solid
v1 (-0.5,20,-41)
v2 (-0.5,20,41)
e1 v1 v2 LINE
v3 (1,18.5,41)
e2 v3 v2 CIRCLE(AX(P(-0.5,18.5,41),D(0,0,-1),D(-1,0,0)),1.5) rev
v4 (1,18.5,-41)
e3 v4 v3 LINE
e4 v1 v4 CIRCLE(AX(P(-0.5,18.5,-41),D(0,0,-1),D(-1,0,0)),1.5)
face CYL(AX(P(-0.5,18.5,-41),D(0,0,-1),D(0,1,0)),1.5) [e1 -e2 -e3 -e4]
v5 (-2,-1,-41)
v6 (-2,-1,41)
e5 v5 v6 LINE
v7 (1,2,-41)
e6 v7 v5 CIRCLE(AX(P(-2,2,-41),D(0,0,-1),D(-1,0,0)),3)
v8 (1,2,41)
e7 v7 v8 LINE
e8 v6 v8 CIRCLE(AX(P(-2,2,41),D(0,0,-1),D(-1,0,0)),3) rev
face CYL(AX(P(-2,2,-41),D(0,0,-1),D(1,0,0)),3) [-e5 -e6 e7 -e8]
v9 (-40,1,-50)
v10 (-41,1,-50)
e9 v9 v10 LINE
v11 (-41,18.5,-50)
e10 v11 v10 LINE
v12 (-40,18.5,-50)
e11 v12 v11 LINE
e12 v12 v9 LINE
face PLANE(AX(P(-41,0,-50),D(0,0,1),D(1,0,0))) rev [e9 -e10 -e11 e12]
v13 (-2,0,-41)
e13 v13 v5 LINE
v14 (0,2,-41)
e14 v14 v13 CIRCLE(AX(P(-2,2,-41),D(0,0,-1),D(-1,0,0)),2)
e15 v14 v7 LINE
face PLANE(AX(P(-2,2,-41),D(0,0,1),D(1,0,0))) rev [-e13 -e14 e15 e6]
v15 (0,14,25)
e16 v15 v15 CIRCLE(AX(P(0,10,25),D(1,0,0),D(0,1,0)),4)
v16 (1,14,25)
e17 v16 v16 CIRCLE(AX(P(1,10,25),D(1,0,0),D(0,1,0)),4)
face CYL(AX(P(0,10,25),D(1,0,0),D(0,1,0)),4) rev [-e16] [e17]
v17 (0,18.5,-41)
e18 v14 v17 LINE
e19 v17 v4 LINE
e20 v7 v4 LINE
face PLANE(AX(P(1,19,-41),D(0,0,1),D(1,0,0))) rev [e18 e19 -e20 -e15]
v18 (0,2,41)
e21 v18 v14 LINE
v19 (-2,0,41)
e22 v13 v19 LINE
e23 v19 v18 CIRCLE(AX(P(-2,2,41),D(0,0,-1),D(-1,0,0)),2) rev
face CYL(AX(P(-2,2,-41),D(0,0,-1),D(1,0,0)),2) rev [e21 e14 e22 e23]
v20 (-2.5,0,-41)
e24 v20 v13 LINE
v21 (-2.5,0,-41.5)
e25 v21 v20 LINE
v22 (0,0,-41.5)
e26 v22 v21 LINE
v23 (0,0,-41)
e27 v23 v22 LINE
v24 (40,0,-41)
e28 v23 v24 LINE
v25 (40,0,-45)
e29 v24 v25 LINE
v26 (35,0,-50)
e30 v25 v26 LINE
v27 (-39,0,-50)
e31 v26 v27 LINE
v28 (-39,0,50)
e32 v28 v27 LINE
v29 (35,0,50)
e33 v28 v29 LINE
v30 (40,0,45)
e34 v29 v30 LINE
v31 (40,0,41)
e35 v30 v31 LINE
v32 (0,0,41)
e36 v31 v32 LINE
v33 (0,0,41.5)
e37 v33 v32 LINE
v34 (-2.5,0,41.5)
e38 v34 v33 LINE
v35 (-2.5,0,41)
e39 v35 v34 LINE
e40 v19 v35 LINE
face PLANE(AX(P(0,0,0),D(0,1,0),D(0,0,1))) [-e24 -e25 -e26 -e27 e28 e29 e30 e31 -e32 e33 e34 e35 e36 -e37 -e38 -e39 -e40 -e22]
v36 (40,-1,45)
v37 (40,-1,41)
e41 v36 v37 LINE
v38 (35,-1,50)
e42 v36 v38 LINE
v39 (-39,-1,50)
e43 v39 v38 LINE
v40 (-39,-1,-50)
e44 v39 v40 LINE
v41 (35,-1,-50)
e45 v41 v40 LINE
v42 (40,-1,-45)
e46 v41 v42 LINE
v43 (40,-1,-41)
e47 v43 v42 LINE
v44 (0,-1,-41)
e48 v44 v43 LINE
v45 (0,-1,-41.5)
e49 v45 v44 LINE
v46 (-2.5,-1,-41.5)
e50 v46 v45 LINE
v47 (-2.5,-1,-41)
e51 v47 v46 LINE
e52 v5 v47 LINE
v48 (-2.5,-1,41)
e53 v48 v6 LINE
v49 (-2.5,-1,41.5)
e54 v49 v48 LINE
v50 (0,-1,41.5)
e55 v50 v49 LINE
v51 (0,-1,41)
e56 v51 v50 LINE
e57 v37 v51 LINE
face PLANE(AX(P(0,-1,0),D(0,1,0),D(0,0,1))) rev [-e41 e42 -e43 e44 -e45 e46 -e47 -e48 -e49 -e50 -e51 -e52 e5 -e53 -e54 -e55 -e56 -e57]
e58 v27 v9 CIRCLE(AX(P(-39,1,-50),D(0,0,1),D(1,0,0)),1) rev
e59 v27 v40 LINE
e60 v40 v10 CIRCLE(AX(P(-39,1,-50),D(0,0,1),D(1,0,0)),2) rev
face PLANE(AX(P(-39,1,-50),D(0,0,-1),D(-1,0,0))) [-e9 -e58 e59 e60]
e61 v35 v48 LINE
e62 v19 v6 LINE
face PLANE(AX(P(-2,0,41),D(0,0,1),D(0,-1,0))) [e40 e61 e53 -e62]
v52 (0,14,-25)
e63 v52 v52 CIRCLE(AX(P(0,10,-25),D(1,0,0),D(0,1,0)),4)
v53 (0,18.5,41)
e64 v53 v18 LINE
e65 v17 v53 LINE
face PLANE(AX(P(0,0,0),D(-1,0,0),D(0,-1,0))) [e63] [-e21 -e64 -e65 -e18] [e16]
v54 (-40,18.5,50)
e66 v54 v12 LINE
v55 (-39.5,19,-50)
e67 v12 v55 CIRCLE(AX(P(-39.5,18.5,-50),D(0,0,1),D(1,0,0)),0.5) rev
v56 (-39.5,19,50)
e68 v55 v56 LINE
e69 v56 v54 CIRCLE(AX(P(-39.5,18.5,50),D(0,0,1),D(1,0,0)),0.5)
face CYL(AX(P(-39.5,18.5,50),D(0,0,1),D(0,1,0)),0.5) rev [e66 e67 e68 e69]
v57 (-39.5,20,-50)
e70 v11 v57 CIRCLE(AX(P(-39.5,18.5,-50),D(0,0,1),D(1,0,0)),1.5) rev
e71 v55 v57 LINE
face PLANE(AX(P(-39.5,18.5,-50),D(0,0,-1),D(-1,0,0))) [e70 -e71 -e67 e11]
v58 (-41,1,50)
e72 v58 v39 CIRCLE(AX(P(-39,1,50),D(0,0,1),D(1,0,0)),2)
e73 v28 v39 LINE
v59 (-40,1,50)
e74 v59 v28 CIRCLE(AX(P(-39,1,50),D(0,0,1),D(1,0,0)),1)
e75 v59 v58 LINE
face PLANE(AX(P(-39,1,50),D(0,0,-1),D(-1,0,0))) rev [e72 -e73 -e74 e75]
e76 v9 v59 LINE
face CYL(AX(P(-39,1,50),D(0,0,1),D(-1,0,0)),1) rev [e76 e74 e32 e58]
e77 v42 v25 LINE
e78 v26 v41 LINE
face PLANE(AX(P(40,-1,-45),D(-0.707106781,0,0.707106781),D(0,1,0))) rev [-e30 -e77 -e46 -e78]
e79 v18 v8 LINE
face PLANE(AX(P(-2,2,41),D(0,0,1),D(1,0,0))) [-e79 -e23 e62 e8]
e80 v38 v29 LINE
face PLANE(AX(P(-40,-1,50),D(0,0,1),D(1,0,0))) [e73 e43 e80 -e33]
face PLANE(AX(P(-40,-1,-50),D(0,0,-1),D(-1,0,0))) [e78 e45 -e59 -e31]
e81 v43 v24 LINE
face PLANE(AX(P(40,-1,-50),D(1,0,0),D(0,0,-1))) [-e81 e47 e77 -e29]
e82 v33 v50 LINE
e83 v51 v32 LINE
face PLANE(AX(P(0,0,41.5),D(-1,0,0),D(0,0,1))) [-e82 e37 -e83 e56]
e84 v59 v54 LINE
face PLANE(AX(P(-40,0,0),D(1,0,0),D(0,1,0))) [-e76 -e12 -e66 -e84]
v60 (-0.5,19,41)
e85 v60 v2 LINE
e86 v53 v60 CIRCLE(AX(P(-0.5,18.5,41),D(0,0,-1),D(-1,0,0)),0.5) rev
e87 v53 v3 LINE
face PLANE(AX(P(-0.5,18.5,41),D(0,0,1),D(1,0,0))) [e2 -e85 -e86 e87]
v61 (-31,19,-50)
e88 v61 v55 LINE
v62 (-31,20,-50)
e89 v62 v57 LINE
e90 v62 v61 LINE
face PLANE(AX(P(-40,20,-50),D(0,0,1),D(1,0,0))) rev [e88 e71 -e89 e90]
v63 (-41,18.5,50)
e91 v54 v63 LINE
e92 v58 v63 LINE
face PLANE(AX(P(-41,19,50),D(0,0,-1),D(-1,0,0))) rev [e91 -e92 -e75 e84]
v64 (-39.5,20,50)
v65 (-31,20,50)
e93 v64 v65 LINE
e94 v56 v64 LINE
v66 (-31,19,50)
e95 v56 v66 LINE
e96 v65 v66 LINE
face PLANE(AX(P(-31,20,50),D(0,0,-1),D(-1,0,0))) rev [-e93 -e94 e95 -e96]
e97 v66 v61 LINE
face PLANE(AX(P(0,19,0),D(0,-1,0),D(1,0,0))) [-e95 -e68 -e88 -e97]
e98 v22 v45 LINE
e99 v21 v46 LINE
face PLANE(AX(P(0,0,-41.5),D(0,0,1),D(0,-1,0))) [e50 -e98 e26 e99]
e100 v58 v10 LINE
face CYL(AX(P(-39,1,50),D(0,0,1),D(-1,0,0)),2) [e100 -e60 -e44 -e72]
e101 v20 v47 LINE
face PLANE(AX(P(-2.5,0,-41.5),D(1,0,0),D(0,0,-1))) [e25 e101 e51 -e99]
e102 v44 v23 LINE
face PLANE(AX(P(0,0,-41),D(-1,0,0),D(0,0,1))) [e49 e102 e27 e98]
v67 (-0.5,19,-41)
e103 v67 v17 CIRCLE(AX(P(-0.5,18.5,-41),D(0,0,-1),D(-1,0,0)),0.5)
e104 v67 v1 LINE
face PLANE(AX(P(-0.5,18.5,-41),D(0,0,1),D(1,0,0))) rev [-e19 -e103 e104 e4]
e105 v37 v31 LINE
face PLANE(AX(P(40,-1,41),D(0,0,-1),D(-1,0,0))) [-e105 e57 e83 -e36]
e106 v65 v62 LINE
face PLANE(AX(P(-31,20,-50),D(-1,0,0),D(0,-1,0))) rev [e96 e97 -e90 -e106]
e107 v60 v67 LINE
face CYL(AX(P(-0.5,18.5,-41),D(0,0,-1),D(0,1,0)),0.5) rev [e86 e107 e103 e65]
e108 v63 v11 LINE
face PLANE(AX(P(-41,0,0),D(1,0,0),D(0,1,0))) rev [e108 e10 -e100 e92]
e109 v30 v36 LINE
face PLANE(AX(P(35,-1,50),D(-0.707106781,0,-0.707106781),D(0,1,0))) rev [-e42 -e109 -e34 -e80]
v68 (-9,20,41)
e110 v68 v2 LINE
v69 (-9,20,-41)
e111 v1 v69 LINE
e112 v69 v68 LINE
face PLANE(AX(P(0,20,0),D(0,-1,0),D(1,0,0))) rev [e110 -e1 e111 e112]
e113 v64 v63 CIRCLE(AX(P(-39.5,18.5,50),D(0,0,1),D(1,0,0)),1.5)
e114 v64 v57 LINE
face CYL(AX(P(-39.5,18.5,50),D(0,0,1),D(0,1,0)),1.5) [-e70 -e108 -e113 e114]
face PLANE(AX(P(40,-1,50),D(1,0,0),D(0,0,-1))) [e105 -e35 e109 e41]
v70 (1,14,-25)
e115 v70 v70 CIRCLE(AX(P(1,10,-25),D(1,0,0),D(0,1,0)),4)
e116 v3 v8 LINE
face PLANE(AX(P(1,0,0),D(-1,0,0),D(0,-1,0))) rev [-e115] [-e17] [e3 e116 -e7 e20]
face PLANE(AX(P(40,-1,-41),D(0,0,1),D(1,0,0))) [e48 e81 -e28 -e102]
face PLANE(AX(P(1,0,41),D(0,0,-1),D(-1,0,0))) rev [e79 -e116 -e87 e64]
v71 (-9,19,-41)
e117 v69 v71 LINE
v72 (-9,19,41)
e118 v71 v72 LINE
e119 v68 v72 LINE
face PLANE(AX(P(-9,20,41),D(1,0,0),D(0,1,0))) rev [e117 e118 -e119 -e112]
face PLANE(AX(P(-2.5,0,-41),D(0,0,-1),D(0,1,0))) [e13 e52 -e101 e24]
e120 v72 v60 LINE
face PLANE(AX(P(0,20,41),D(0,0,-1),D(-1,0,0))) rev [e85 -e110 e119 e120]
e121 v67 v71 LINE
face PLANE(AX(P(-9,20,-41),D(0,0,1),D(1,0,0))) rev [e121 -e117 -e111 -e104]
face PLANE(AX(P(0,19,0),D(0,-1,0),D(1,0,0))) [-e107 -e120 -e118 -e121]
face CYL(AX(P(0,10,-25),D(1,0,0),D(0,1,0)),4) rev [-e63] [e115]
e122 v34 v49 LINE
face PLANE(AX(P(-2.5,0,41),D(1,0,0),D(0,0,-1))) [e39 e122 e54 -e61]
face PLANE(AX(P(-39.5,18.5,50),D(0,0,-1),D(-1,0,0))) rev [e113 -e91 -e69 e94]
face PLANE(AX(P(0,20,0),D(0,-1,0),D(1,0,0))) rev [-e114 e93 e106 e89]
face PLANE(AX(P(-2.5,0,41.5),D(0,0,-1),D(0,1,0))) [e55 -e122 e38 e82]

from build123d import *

# Parameters (mm, degrees)
BASE_FLANGE1_DEPTH           = 1
BREAK_CORNER1_START          = 60.104076401
BREAK_CORNER1_OUTLINE_W      = 72.104076401
BREAK_CORNER1_OUTLINE_H      = 3
BREAK_CORNER1_DEPTH          = 3.535533906
BREAK_CORNER1_START_2        = -12
BREAK_CORNER1_2_OUTLINE_W    = 4.895923599
BREAK_CORNER1_2_OUTLINE_H    = 3
BREAK_CORNER1_2_DEPTH        = 11.292893219
EDGE_FLANGE1_STRIP_W         = 6
EDGE_FLANGE1_STRIP_H         = 1
EDGE_FLANGE1_STRIP_CUT_DEPTH = 100
EDGE_FLANGE1_DEPTH           = 100
EDGE_FLANGE2_STRIP_W         = 5
EDGE_FLANGE2_STRIP_H         = 1
EDGE_FLANGE2_STRIP_CUT_DEPTH = 100
EDGE_FLANGE2_DEPTH           = 100
EDGE_FLANGE3_START           = -2.5
EDGE_FLANGE3_OUTLINE_W       = 0.5
EDGE_FLANGE3_OUTLINE_H       = 1
EDGE_FLANGE3_DEPTH           = 2.5
EDGE_FLANGE3_START_2         = -1.23595
EDGE_FLANGE3_2_OUTLINE_W     = 19
EDGE_FLANGE3_2_OUTLINE_H     = 82
EDGE_FLANGE3_2_DEPTH         = 2.23595
EDGE_FLANGE3_3_OUTLINE_W     = 1
EDGE_FLANGE3_3_OUTLINE_H     = 82
EDGE_FLANGE3_3_DEPTH         = 0.70822
EDGE_FLANGE3_START_3         = -41
EDGE_FLANGE3_4_DEPTH         = 82
EDGE_FLANGE3_5_DEPTH         = 82
EDGE_FLANGE4_STRIP_W         = 5
EDGE_FLANGE4_STRIP_H         = 1
EDGE_FLANGE4_STRIP_CUT_DEPTH = 82
EDGE_FLANGE4_DEPTH           = 82
SKETCH18_R                   = 4
CUT_EXTRUDE1_DEPTH           = 10


with BuildPart() as part:
    # Base-Flange1: sheet metal written as solids
    # Sketch1 → Base-Flange1 (new body)
    with BuildSketch(Plane(origin=(0, 0, 0), x_dir=(1, 0, 0), z_dir=(0, 1, 0))):
        Polygon((39.172092849, 50), (40, 50), (40, 41), (0, 41), (0, -41), (40, -41), (40, -50), (-40, -50), (-40, 50), align=None)
    extrude(amount=-BASE_FLANGE1_DEPTH)

    # Break-Corner1: read off the stored shape, not the designer's step
    # Break-Corner1 outline → Break-Corner1 (cut)
    with BuildSketch(Plane(origin=(0, 0, 0), x_dir=(0.707106781186548, 0, -0.707106781186547), z_dir=(0.707106781186547, 0, 0.707106781186548)).offset(BREAK_CORNER1_START)):
        with Locations((24.052038201, -0.5)):
            Rectangle(BREAK_CORNER1_OUTLINE_W, BREAK_CORNER1_OUTLINE_H)
    extrude(amount=BREAK_CORNER1_DEPTH, mode=Mode.SUBTRACT)

    # Break-Corner1 2 outline → Break-Corner1 2 (cut)
    with BuildSketch(Plane(origin=(0, 0, 0), x_dir=(0.707106781186548, 0, -0.707106781186547), z_dir=(0.707106781186547, 0, 0.707106781186548)).offset(BREAK_CORNER1_START_2)):
        with Locations((62.552038201, -0.5)):
            Rectangle(BREAK_CORNER1_2_OUTLINE_W, BREAK_CORNER1_2_OUTLINE_H)
    extrude(amount=BREAK_CORNER1_2_DEPTH, mode=Mode.SUBTRACT)

    # Edge-Flange1: sheet metal written as solids
    # Edge-Flange1 strip (on a plane across the edge) → Edge-Flange1 strip cut (cut)
    with BuildSketch(Plane(origin=(-40, 0, -50), x_dir=(1, 0, 0), z_dir=(0, 0, 1))):
        with Locations((-2, -0.5)):
            Rectangle(EDGE_FLANGE1_STRIP_W, EDGE_FLANGE1_STRIP_H)
    extrude(amount=EDGE_FLANGE1_STRIP_CUT_DEPTH, mode=Mode.SUBTRACT)

    # Edge-Flange1 section (on a plane across the edge) → Edge-Flange1 (add)
    with BuildSketch(Plane(origin=(-40, 0, -50), x_dir=(1, 0, 0), z_dir=(0, 0, 1))):
        with BuildLine():
            Line((-1, 1), (-1, 19))
            Line((-1, 19), (0, 19))
            Line((0, 19), (0, 1))
            ThreePointArc((0, 1), (0.292893219, 0.292893219), (1, 0))
            Line((1, 0), (1, -1))
            ThreePointArc((1, -1), (-0.414213562, -0.414213562), (-1, 1))
        make_face()
    extrude(amount=EDGE_FLANGE1_DEPTH)

    # Edge-Flange2: sheet metal written as solids
    # Edge-Flange2 strip (on a plane across the edge) → Edge-Flange2 strip cut (cut)
    with BuildSketch(Plane(origin=(-40, 19, -50), x_dir=(0, -1, 0), z_dir=(0, 0, 1))):
        with Locations((-2, -0.5)):
            Rectangle(EDGE_FLANGE2_STRIP_W, EDGE_FLANGE2_STRIP_H)
    extrude(amount=EDGE_FLANGE2_STRIP_CUT_DEPTH, mode=Mode.SUBTRACT)

    # Edge-Flange2 section (on a plane across the edge) → Edge-Flange2 (add)
    with BuildSketch(Plane(origin=(-40, 19, -50), x_dir=(0, -1, 0), z_dir=(0, 0, 1))):
        with BuildLine():
            Line((-1, 0.5), (-1, 9))
            Line((-1, 9), (0, 9))
            Line((0, 9), (0, 0.5))
            ThreePointArc((0, 0.5), (0.146446609, 0.146446609), (0.5, 0))
            Line((0.5, 0), (0.5, -1))
            ThreePointArc((0.5, -1), (-0.560660172, -0.560660172), (-1, 0.5))
        make_face()
    extrude(amount=EDGE_FLANGE2_DEPTH)

    # Edge-Flange3: read off the stored shape, not the designer's step
    # Edge-Flange3 outline → Edge-Flange3 (cut)
    with BuildSketch(Plane(origin=(0, 0, 0), x_dir=(0, 0, -1), z_dir=(1, 0, 0)).offset(EDGE_FLANGE3_START)):
        with Locations((41.25, -0.5)):
            Rectangle(EDGE_FLANGE3_OUTLINE_W, EDGE_FLANGE3_OUTLINE_H)
        with Locations((-41.25, -0.5)):
            Rectangle(EDGE_FLANGE3_OUTLINE_W, EDGE_FLANGE3_OUTLINE_H)
    extrude(amount=EDGE_FLANGE3_DEPTH, mode=Mode.SUBTRACT)

    # Edge-Flange3 2 outline → Edge-Flange3 2 (add)
    with BuildSketch(Plane.YZ.offset(EDGE_FLANGE3_START_2)):
        with Locations((9.5, 0)):
            Rectangle(EDGE_FLANGE3_2_OUTLINE_W, EDGE_FLANGE3_2_OUTLINE_H)
    extrude(amount=EDGE_FLANGE3_2_DEPTH)

    # Edge-Flange3 3 outline → Edge-Flange3 3 (add)
    with BuildSketch(Plane.YZ):
        with Locations((-0.5, 0)):
            Rectangle(EDGE_FLANGE3_3_OUTLINE_W, EDGE_FLANGE3_3_OUTLINE_H)
    extrude(amount=EDGE_FLANGE3_3_DEPTH)

    # Edge-Flange3 4 outline → Edge-Flange3 4 (add)
    with BuildSketch(Plane.XY.offset(EDGE_FLANGE3_START_3)):
        with BuildLine():
            Line((-1.23595, -0.901073525), (-1.23595, 0.151696022))
            ThreePointArc((-1.23595, 0.151696022), (-1.610518266, 0.038290547), (-2, 0))
            Line((-2, 0), (-3, -1e-09))
            Line((-3, -1e-09), (-3, -0.999999999))
            Line((-3, -0.999999999), (-2, -1))
            ThreePointArc((-2, -1), (-1.614786147, -0.97516559), (-1.23595, -0.901073525))
        make_face()
    extrude(amount=EDGE_FLANGE3_4_DEPTH)

    # Edge-Flange3 5 outline → Edge-Flange3 5 (cut)
    with BuildSketch(Plane.XY.offset(EDGE_FLANGE3_START_3)):
        with BuildLine():
            Line((0, 2), (0, 19))
            Line((0, 19), (-1.23595, 19))
            Line((-1.23595, 19), (-1.23595, 0.151696022))
            ThreePointArc((-1.23595, 0.151696022), (-0.337456768, 0.888267119), (0, 2))
        make_face()
        with BuildLine():
            Line((1, 0), (1, 2))
            ThreePointArc((1, 2), (0.121320344, -0.121320344), (-2, -1))
            Line((-2, -1), (0.70822, -1))
            Line((0.70822, -1), (0.70822, 0))
            Line((0.70822, 0), (1, 0))
        make_face()
    extrude(amount=EDGE_FLANGE3_5_DEPTH, mode=Mode.SUBTRACT)

    # Edge-Flange4: sheet metal written as solids
    # Edge-Flange4 strip (on a plane across the edge) → Edge-Flange4 strip cut (cut)
    with BuildSketch(Plane(origin=(0, 19, 41), x_dir=(0, -1, 0), z_dir=(0, 0, -1))):
        with Locations((-2, -0.5)):
            Rectangle(EDGE_FLANGE4_STRIP_W, EDGE_FLANGE4_STRIP_H)
    extrude(amount=EDGE_FLANGE4_STRIP_CUT_DEPTH, mode=Mode.SUBTRACT)

    # Edge-Flange4 section (on a plane across the edge) → Edge-Flange4 (add)
    with BuildSketch(Plane(origin=(0, 19, 41), x_dir=(0, -1, 0), z_dir=(0, 0, -1))):
        with BuildLine():
            Line((-1, 0.5), (-1, 9))
            Line((-1, 9), (0, 9))
            Line((0, 9), (0, 0.5))
            ThreePointArc((0, 0.5), (0.146446609, 0.146446609), (0.5, 0))
            Line((0.5, 0), (0.5, -1))
            ThreePointArc((0.5, -1), (-0.560660172, -0.560660172), (-1, 0.5))
        make_face()
    extrude(amount=EDGE_FLANGE4_DEPTH)

    # Sketch18 → Cut-Extrude1 (cut)
    with BuildSketch(Plane(origin=(1, 0, 0), x_dir=(0, 0, -1), z_dir=(1, 0, 0))):
        with Locations(Location((-25, 10, 0), (0, 0, 90))):
            Circle(SKETCH18_R)
        with Locations(Location((25, 10, 0), (0, 0, 90))):
            Circle(SKETCH18_R)
    extrude(amount=-CUT_EXTRUDE1_DEPTH, mode=Mode.SUBTRACT)


solid = part.part
